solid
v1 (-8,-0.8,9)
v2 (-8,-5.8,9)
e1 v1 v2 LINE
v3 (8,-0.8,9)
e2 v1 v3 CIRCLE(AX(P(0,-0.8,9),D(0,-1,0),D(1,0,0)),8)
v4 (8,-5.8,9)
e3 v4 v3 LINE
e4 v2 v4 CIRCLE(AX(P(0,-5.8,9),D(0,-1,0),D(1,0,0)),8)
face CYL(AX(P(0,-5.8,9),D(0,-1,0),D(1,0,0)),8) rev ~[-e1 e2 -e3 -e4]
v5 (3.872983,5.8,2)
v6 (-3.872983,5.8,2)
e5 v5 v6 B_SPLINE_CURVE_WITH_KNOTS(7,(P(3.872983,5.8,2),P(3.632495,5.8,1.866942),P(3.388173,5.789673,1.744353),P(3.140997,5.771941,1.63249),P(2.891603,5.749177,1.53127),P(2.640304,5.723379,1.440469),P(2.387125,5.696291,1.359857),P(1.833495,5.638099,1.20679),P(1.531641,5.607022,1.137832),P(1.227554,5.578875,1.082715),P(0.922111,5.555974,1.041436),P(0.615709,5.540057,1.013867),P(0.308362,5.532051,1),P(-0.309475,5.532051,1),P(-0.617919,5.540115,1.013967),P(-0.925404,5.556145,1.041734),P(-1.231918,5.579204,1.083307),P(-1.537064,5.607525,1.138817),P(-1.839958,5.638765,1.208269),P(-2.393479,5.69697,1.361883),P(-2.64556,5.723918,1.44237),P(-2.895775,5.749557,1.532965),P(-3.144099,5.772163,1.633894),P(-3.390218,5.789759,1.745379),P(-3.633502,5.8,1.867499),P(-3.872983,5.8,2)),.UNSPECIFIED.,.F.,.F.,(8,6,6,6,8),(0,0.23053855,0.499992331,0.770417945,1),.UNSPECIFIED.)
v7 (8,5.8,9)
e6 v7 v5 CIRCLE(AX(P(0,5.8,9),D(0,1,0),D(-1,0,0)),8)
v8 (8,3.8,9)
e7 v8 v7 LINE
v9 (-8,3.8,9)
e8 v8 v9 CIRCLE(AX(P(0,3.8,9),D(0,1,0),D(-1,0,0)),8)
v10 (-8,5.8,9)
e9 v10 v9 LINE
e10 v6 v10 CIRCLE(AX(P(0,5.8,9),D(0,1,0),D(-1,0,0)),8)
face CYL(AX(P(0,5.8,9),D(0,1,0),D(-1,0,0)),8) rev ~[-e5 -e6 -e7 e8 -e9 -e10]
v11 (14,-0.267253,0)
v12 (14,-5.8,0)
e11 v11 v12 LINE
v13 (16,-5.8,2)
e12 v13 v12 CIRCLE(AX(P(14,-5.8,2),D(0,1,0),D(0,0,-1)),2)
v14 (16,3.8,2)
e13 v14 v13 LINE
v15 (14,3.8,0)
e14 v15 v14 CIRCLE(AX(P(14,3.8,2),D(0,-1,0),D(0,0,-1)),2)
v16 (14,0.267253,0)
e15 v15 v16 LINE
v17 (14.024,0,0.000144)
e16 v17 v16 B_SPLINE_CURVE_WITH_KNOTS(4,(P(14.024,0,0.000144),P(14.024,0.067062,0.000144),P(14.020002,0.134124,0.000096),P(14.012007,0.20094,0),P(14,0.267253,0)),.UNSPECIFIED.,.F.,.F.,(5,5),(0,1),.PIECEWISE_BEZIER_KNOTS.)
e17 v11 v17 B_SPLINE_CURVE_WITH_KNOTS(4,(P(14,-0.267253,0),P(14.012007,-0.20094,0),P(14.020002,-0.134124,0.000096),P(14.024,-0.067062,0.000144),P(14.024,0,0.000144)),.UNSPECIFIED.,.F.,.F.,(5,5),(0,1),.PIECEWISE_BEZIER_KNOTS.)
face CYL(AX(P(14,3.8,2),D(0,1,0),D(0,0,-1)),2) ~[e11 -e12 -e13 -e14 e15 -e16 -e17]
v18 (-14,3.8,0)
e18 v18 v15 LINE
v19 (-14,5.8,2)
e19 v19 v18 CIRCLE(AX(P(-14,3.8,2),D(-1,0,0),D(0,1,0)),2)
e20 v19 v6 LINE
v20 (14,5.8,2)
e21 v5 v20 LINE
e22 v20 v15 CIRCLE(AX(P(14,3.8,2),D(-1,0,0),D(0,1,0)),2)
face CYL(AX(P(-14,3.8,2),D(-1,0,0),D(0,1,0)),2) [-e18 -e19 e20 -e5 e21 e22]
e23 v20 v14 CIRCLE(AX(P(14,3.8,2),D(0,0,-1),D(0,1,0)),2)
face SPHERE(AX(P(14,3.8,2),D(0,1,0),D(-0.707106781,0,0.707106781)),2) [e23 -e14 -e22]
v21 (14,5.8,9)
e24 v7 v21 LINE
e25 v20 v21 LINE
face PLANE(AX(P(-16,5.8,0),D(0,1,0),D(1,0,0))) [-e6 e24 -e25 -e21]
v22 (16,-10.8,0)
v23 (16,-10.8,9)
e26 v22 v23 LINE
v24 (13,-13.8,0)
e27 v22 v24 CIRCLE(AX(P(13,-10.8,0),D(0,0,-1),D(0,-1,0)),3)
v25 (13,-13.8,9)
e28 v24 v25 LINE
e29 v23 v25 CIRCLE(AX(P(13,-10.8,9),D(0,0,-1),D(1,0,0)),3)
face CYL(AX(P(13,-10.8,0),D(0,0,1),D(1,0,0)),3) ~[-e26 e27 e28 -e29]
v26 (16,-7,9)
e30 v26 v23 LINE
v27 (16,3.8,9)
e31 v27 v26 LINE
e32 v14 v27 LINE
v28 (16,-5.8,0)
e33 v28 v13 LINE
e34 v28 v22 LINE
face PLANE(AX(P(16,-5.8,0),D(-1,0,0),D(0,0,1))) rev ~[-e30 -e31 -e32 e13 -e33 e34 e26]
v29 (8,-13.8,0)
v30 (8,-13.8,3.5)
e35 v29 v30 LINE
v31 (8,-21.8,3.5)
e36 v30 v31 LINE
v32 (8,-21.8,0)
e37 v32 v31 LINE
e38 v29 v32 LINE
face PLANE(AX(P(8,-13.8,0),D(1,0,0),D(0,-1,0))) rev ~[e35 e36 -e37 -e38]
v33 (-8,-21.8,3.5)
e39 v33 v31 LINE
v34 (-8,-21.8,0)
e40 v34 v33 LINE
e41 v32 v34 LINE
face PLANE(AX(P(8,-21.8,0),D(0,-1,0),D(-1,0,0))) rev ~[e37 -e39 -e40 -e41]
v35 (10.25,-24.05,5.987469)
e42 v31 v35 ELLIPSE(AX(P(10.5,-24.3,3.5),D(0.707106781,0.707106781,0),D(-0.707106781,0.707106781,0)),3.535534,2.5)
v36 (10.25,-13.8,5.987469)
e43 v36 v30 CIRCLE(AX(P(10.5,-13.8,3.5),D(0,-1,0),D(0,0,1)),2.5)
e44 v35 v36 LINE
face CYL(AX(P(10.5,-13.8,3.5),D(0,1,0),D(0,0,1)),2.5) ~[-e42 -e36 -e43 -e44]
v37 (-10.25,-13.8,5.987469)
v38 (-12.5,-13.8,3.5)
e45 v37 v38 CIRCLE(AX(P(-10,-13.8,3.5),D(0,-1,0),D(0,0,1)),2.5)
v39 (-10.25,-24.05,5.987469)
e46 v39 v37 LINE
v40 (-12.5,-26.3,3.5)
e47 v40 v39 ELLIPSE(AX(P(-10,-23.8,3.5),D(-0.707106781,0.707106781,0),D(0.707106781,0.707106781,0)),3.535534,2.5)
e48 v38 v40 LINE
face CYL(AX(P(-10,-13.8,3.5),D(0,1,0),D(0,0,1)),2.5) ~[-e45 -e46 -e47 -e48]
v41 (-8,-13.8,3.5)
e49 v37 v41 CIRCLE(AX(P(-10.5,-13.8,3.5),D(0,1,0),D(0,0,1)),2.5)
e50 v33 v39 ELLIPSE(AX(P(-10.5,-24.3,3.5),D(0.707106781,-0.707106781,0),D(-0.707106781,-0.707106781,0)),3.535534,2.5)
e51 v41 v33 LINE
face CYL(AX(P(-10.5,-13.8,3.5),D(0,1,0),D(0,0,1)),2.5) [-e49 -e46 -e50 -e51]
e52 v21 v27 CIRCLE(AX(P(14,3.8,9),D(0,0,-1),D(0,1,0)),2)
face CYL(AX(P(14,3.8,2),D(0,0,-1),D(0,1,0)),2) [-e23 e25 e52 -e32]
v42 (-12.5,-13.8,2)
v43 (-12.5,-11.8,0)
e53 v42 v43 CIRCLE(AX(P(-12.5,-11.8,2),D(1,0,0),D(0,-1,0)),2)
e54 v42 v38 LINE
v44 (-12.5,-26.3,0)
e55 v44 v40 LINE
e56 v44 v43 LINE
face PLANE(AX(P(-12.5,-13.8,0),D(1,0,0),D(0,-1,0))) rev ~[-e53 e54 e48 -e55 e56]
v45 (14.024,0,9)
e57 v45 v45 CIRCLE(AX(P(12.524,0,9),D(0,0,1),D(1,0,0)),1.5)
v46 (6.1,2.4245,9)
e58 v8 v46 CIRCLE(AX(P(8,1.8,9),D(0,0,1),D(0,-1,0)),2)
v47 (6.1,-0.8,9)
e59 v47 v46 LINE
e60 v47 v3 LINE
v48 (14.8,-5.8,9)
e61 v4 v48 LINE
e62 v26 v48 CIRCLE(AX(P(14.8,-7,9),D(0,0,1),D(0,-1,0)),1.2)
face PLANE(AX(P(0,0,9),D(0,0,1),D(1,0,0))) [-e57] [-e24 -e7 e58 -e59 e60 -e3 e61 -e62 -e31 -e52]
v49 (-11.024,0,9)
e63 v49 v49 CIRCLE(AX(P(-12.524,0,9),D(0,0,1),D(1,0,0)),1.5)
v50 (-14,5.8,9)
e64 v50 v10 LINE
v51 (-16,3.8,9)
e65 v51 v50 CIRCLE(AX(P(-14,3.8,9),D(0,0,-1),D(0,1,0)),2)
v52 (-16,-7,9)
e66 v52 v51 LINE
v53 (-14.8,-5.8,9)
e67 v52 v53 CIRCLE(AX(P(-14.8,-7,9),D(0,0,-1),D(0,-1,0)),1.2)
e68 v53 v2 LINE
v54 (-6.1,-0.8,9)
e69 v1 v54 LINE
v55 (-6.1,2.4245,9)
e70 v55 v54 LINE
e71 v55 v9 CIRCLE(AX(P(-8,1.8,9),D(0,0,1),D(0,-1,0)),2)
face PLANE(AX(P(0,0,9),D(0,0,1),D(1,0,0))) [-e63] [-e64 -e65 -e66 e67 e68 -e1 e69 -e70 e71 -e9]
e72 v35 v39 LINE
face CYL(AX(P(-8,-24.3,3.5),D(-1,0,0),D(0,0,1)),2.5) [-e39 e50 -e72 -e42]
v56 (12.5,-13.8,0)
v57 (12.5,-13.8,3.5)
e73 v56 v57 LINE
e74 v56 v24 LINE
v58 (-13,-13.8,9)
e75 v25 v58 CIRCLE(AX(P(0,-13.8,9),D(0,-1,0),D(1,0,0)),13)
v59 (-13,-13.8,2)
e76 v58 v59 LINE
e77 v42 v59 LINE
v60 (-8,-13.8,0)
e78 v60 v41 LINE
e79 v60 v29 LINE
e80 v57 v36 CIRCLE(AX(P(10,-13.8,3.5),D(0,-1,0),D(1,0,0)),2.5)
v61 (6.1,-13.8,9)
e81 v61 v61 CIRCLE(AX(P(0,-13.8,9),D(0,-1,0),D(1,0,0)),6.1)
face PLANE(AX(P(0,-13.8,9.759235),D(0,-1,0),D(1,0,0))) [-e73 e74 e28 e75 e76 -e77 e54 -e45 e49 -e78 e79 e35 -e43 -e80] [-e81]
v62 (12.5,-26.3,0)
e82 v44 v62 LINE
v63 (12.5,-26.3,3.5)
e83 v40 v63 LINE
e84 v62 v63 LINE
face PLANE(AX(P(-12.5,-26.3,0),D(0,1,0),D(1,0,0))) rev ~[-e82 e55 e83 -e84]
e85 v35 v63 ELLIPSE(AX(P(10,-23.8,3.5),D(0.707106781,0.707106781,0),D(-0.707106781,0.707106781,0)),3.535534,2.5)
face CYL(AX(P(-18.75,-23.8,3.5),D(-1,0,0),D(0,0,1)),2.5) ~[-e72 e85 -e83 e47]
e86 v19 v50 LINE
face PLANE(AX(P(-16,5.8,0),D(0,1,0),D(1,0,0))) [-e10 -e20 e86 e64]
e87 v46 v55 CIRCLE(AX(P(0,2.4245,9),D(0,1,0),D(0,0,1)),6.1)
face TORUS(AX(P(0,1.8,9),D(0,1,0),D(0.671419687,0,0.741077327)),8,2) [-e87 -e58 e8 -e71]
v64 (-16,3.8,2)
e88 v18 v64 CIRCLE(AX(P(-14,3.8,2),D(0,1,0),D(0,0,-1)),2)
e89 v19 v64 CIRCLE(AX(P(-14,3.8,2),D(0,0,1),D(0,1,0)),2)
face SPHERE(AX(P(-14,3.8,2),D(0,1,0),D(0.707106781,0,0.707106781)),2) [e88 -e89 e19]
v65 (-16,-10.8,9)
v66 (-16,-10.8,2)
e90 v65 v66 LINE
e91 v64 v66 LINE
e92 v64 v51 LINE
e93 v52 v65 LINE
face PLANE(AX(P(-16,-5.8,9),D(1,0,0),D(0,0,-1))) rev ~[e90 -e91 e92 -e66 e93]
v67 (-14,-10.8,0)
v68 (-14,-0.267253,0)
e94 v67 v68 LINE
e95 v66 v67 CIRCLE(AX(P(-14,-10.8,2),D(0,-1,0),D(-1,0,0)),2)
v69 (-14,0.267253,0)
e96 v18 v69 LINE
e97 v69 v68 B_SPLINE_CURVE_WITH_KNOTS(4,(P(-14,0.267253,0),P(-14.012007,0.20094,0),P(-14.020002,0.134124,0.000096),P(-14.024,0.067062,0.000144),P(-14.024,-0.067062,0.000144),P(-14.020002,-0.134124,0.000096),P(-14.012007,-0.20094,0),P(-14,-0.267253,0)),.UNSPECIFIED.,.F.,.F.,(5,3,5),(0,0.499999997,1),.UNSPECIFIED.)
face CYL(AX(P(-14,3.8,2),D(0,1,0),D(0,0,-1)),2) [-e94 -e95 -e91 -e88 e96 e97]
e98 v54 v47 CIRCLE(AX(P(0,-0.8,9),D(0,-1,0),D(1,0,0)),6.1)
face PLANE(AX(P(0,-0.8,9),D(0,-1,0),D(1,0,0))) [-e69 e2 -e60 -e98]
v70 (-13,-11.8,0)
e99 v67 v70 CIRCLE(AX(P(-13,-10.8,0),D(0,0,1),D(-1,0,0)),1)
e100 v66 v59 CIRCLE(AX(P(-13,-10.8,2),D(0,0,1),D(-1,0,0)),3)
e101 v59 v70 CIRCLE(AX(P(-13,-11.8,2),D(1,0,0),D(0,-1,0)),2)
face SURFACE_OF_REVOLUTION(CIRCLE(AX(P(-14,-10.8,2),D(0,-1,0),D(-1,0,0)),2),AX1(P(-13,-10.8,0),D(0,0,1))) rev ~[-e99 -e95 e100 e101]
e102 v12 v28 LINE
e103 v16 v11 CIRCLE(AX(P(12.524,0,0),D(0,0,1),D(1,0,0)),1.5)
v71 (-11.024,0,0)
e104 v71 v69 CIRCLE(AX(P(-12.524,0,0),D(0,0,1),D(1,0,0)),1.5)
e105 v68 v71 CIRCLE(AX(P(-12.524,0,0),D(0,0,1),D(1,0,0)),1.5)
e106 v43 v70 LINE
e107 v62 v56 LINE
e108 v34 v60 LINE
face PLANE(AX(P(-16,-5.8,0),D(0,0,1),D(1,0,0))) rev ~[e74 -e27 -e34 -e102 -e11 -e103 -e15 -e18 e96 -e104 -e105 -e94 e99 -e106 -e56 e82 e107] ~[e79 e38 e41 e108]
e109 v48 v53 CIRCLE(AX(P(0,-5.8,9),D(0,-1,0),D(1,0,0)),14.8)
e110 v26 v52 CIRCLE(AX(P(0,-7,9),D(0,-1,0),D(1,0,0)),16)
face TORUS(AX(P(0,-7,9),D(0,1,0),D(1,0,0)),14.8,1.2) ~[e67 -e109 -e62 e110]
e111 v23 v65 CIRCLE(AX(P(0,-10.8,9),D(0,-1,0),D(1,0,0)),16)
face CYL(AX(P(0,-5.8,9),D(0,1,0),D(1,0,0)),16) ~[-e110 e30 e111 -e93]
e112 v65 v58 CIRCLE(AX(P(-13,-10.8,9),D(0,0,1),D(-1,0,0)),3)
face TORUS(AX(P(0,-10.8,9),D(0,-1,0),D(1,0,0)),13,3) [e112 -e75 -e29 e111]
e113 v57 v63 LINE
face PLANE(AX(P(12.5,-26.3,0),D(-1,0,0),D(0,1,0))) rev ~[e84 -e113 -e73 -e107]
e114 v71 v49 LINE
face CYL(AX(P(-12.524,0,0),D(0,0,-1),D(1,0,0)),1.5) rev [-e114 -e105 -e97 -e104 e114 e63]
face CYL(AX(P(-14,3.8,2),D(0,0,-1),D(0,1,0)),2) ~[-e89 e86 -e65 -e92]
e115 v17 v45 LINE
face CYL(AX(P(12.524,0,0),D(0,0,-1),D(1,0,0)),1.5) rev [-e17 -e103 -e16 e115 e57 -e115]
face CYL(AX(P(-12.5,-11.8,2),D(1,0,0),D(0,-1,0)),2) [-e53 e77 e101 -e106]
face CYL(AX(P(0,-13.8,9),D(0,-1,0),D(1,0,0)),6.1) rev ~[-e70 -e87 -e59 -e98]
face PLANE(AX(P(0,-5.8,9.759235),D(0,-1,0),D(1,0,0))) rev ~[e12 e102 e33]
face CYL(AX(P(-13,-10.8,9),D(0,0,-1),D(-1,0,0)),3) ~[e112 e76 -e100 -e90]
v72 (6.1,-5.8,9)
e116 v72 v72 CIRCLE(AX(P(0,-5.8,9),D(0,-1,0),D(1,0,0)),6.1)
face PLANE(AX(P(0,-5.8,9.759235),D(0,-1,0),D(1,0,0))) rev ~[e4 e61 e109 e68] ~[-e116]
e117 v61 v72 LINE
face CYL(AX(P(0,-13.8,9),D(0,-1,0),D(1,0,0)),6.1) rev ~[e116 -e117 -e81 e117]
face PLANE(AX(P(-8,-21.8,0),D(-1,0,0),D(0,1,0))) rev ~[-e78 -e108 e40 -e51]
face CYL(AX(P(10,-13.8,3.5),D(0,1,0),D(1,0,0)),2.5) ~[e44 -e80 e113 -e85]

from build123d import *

# Parameters (mm, degrees)
F0_W          = 32
F0_H          = 11.6
F0_R          = 1.5
F1_DEPTH      = 9
F2_R          = 8
F1_FACE1_W    = 32
F1_FACE1_H    = 9
F3_DEPTH      = 5
F4_R          = 8
F5_DEPTH      = 2
F6_R          = 6
F7_DEPTH      = 25
F8_T1_DEPTH   = 28
F8_T3_DEPTH   = 12
F8_T5_DEPTH   = 14.6
F8_S9_W       = 2
F8_S9_H       = 2
F8_T10_DEPTH  = 2
F8_S15_W      = 2
F8_S15_H      = 2
F8_T16_DEPTH  = 2
F8_T20_ANGLE  = 275.6465366004
F10_DEPTH     = 8
F12_DEPTH     = 6
F13_T1_DEPTH  = 8
F13_T3_DEPTH  = 18.75
F13_T5_DEPTH  = 16
F13_T7_DEPTH  = 37.5
F13_T13_DEPTH = 14.25
F13_T17_DEPTH = 22.25
F13_T24_DEPTH = 14.25
F13_T28_DEPTH = 22.25
F14_R         = 3
F15_R         = 1.2
F16_R         = 6.1
F17_DEPTH     = 19.6010001
F18_T3_ANGLE  = 90
F18_T6_DEPTH  = 10
F18_T9_DEPTH  = 0.5


# Not quite as in the source:
# - a fillet or chamfer that OpenCascade refuses, or shapes differently, is made with other operations: its cross-section is extruded or revolved along the edge and cut away or added


with BuildPart() as f1:
    # F0 (on Top) → F1 (new body)
    with BuildSketch(Plane.XY):
        Rectangle(F0_W, F0_H)
        with Locations((-12.524, 0)):
            Circle(F0_R, mode=Mode.SUBTRACT)
        with Locations((12.524, 0)):
            Circle(F0_R, mode=Mode.SUBTRACT)
    extrude(amount=F1_DEPTH)

    # F2 (on face) + F1_face1 (on face) → F3 (cut)
    with BuildSketch(Plane.XZ.offset(5.8)):
        with Locations((0, 9)):
            Circle(F2_R)
    with BuildSketch(Plane(origin=(0, 5.8, 4.5), x_dir=(-1, 0, 0), z_dir=(0, 1, 0))):
        Rectangle(F1_FACE1_W, F1_FACE1_H)
    extrude(amount=-F3_DEPTH, dir=(0, -1, 0), mode=Mode.SUBTRACT)

    # F4 (on face) → F5 (cut)
    with BuildSketch(Plane(origin=(0, 5.8, 0), x_dir=(-1, 0, 0), z_dir=(0, 1, 0))):
        with Locations((0, 9)):
            Circle(F4_R)
    extrude(amount=-F5_DEPTH, mode=Mode.SUBTRACT)

    # F6 (on face) → F7 (cut)
    with BuildSketch(Plane(origin=(0, 3.8, 0), x_dir=(-1, 0, 0), z_dir=(0, 1, 0))):
        with Locations((0, 9)):
            Circle(F6_R)
    extrude(amount=-F7_DEPTH, mode=Mode.SUBTRACT)

    # F8: fillet of radius 2 on 6 edges, made by hand

    # F8_s2 → F8_t1 (cut)
    with BuildSketch(Plane.YZ.offset(-14)):
        with BuildLine():
            ThreePointArc((5.8, 2), (5.2142135624, 0.5857864376), (3.8, 0))
            Line((3.8, 0), (5.8, 0))
            Line((5.8, 0), (5.8, 2))
        make_face()
    extrude(amount=F8_T1_DEPTH, mode=Mode.SUBTRACT)

    # F8_s4 → F8_t3 (cut)
    with BuildSketch(Plane.XY.offset(2)):
        with BuildLine():
            ThreePointArc((-14, 5.8), (-15.4142135624, 5.2142135624), (-16, 3.8))
            Line((-16, 3.8), (-16, 5.8))
            Line((-16, 5.8), (-14, 5.8))
        make_face()
        with BuildLine():
            ThreePointArc((14, 5.8), (15.4142135624, 5.2142135624), (16, 3.8))
            Line((16, 3.8), (16, 5.8))
            Line((16, 5.8), (14, 5.8))
        make_face()
    extrude(amount=F8_T3_DEPTH, mode=Mode.SUBTRACT)

    # F8_s6 → F8_t5 (cut)
    with BuildSketch(Plane.XZ.offset(-3.8)):
        with BuildLine():
            ThreePointArc((-14, 0), (-15.4142135624, 0.5857864376), (-16, 2))
            Line((-16, 2), (-16, 0))
            Line((-16, 0), (-14, 0))
        make_face()
        with BuildLine():
            ThreePointArc((14, 0), (15.4142135624, 0.5857864376), (16, 2))
            Line((16, 2), (16, 0))
            Line((16, 0), (14, 0))
        make_face()
    extrude(amount=F8_T5_DEPTH, mode=Mode.SUBTRACT)


with BuildPart() as f8_tool8:
    # F8_s9 → F8_t10 (new body)
    with BuildSketch(Plane.XZ.offset(-3.8)):
        with Locations((15, 1)):
            Rectangle(F8_S9_W, F8_S9_H)
    extrude(amount=-F8_T10_DEPTH)

    # F8_s11 → F8_t12 (revolve, cut)
    with BuildSketch(Plane(origin=(14, 3.8, 2), x_dir=(-0.7071067812, 0, 0.7071067812), z_dir=(-0.7071067812, 0, -0.7071067812))):
        with BuildLine():
            ThreePointArc((0, -2), (2, 0), (0, 2))
            Line((0, 2), (0, -2))
        make_face()
    revolve(axis=Axis((14, 3.8, 2), (0, 1, 0)), mode=Mode.SUBTRACT)


with BuildPart() as f1_1:
    add(f1.part)

    # F8_t7: cut F8_tool8
    add(f8_tool8.part, mode=Mode.SUBTRACT)


with BuildPart() as f8_tool14:
    # F8_s15 → F8_t16 (new body)
    with BuildSketch(Plane.XZ.offset(-3.8)):
        with Locations((-15, 1)):
            Rectangle(F8_S15_W, F8_S15_H)
    extrude(amount=-F8_T16_DEPTH)

    # F8_s17 → F8_t18 (revolve, cut)
    with BuildSketch(Plane(origin=(-14, 3.8, 2), x_dir=(0.7071067812, 0, 0.7071067812), z_dir=(-0.7071067812, 0, 0.7071067812))):
        with BuildLine():
            ThreePointArc((0, -2), (2, 0), (0, 2))
            Line((0, 2), (0, -2))
        make_face()
    revolve(axis=Axis((-14, 3.8, 2), (0, 1, 0)), mode=Mode.SUBTRACT)


with BuildPart() as f1_2:
    add(f1_1.part)

    # F8_t13: cut F8_tool14
    add(f8_tool14.part, mode=Mode.SUBTRACT)

    # F8_s19 → F8_t20 (revolve, cut)
    with BuildSketch(Plane(origin=(-4.4781651596, 0, 4.057239564), x_dir=(0, 1, 0), z_dir=(-0.7410773266, 0, 0.6714196869))):
        with BuildLine():
            ThreePointArc((3.8, -14.6696959394), (3.2142135624, -13.255482377), (1.8, -12.6696959394))
            Line((1.8, -12.6696959394), (3.8, -12.6696959394))
            Line((3.8, -12.6696959394), (3.8, -14.6696959394))
        make_face()
    revolve(axis=Axis((0, 3.8, 9), (0, 1, 0)), revolution_arc=F8_T20_ANGLE, mode=Mode.SUBTRACT)

    # F9 (on face) → F10 (join)
    with BuildSketch(Plane.XZ.offset(5.8)):
        with BuildLine():
            Line((16, 0), (16, 9))
            ThreePointArc((16, 9), (0, 25), (-16, 9))
            Line((-16, 9), (-16, 0))
            Line((-16, 0), (-13.2287565553, 0))
            Line((-13.2287565553, 0), (0, 0))
            Line((0, 0), (13.2287565553, 0))
            Line((13.2287565553, 0), (16, 0))
        make_face()
    extrude(amount=F10_DEPTH)

    # F11 (on Top) → F12 (join)
    with BuildSketch(Plane.XY):
        Polygon((-8, -21.8), (-8, -13.8), (-12.5, -13.8), (-12.5, -26.3), (12.5, -26.3), (12.5, -13.8), (8, -13.8), (8, -21.8), align=None)
    extrude(amount=F12_DEPTH)

    # F13: fillet of radius 2.5 on 6 edges, made by hand

    # F13_s2 → F13_t1 (cut)
    with BuildSketch(Plane.XZ.offset(13.8)):
        with BuildLine():
            ThreePointArc((-10.5, 6), (-8.732233047, 5.267766953), (-8, 3.5))
            Line((-8, 3.5), (-8, 6))
            Line((-8, 6), (-10.5, 6))
        make_face()
        with BuildLine():
            ThreePointArc((10.5, 6), (8.732233047, 5.267766953), (8, 3.5))
            Line((8, 3.5), (8, 6))
            Line((8, 6), (10.5, 6))
        make_face()
    extrude(amount=F13_T1_DEPTH, mode=Mode.SUBTRACT)

    # F13_s4 → F13_t3 (cut)
    with BuildSketch(Plane.XZ.offset(13.8)):
        with BuildLine():
            ThreePointArc((-10, 6), (-11.767766953, 5.267766953), (-12.5, 3.5))
            Line((-12.5, 3.5), (-12.5, 6))
            Line((-12.5, 6), (-10, 6))
        make_face()
        with BuildLine():
            ThreePointArc((12.5, 3.5), (11.767766953, 5.267766953), (10, 6))
            Line((10, 6), (12.5, 6))
            Line((12.5, 6), (12.5, 3.5))
        make_face()
    extrude(amount=F13_T3_DEPTH, mode=Mode.SUBTRACT)

    # F13_s6 → F13_t5 (cut)
    with BuildSketch(Plane.YZ.offset(-8)):
        with BuildLine():
            ThreePointArc((-24.3, 6), (-22.532233047, 5.267766953), (-21.8, 3.5))
            Line((-21.8, 3.5), (-21.8, 6))
            Line((-21.8, 6), (-24.3, 6))
        make_face()
    extrude(amount=F13_T5_DEPTH, mode=Mode.SUBTRACT)

    # F13_s8 → F13_t7 (cut)
    with BuildSketch(Plane.YZ.offset(-18.75)):
        with BuildLine():
            ThreePointArc((-23.8, 6), (-25.567766953, 5.267766953), (-26.3, 3.5))
            Line((-26.3, 3.5), (-26.3, 6))
            Line((-26.3, 6), (-23.8, 6))
        make_face()
    extrude(amount=F13_T7_DEPTH, mode=Mode.SUBTRACT)


with BuildPart() as f13_tool11:
    # F13_s12 → F13_t13 (new body)
    with BuildSketch(Plane.XZ.offset(28.05)):
        with BuildLine():
            ThreePointArc((-10.5, 6), (-8.732233047, 5.267766953), (-8, 3.5))
            Line((-8, 3.5), (-8, 6))
            Line((-8, 6), (-10.5, 6))
        make_face()
    extrude(amount=-F13_T13_DEPTH)

    split(bisect_by=Plane.XZ.offset(21.8), keep=Keep.TOP)


with BuildPart() as f13_tool15:
    # F13_s16 → F13_t17 (new body)
    with BuildSketch(Plane.YZ.offset(8)):
        with BuildLine():
            ThreePointArc((-24.3, 6), (-22.532233047, 5.267766953), (-21.8, 3.5))
            Line((-21.8, 3.5), (-21.8, 6))
            Line((-21.8, 6), (-24.3, 6))
        make_face()
    extrude(amount=-F13_T17_DEPTH)

    split(bisect_by=Plane.YZ.offset(-8), keep=Keep.BOTTOM)


with BuildPart() as f13_tool11_1:
    add(f13_tool11.part)

    # F13_t19: intersect F13_tool15
    add(f13_tool15.part, mode=Mode.INTERSECT)


with BuildPart() as f1_3:
    add(f1_2.part)

    # F13_t9: cut F13_tool11
    add(f13_tool11_1.part, mode=Mode.SUBTRACT)


with BuildPart() as f13_tool22:
    # F13_s23 → F13_t24 (new body)
    with BuildSketch(Plane.XZ.offset(13.8)):
        with BuildLine():
            ThreePointArc((10.5, 6), (8.732233047, 5.267766953), (8, 3.5))
            Line((8, 3.5), (8, 6))
            Line((8, 6), (10.5, 6))
        make_face()
    extrude(amount=F13_T24_DEPTH)

    split(bisect_by=Plane.XZ.offset(21.8), keep=Keep.TOP)


with BuildPart() as f13_tool26:
    # F13_s27 → F13_t28 (new body)
    with BuildSketch(Plane.YZ.offset(14.25)):
        with BuildLine():
            ThreePointArc((-24.3, 6), (-22.532233047, 5.267766953), (-21.8, 3.5))
            Line((-21.8, 3.5), (-21.8, 6))
            Line((-21.8, 6), (-24.3, 6))
        make_face()
    extrude(amount=-F13_T28_DEPTH)

    split(bisect_by=Plane.YZ.offset(8), keep=Keep.TOP)


with BuildPart() as f13_tool22_1:
    add(f13_tool22.part)

    # F13_t30: intersect F13_tool26
    add(f13_tool26.part, mode=Mode.INTERSECT)


with BuildPart() as f1_4:
    add(f1_3.part)

    # F13_t20: cut F13_tool22
    add(f13_tool22_1.part, mode=Mode.SUBTRACT)

    # F14
    f14_edges = [f1_4.edges().sort_by_distance(p)[0] for p in [
        (0, -13.8, 25),
        (16, -13.8, 4.5),
    ]]
    fillet(f14_edges, radius=F14_R)

    # F15
    f15_edges = [f1_4.edges().sort_by_distance(p)[0] for p in [
        (0, -5.8, 25),
    ]]
    fillet(f15_edges, radius=F15_R)

    # F16 (on face) → F17 (cut, through all)
    with BuildSketch(Plane.XZ.offset(13.8)):
        with Locations((0, 9)):
            Circle(F16_R)
    extrude(amount=-F17_DEPTH, mode=Mode.SUBTRACT)

    # F18: fillet of radius 2 on 3 edges, made by hand


with BuildPart() as f18_tool1:
    # F18_s2 → F18_t3 (revolve)
    with BuildSketch(Plane.XZ.offset(10.8)):
        with BuildLine():
            ThreePointArc((-16, 2), (-15.4142135624, 0.5857864376), (-14, 0))
            Line((-14, 0), (-16, 0))
            Line((-16, 0), (-16, 2))
        make_face()
    revolve(axis=Axis((-13, -10.8, 0), (0, 0, 1)), revolution_arc=F18_T3_ANGLE)


with BuildPart() as f18_tool4:
    # F18_s5 → F18_t6 (new body)
    with BuildSketch(Plane.XZ.offset(0.8)):
        with BuildLine():
            ThreePointArc((-16, 2), (-15.4142135624, 0.5857864376), (-14, 0))
            Line((-14, 0), (-16, 0))
            Line((-16, 0), (-16, 2))
        make_face()
    extrude(amount=F18_T6_DEPTH)


with BuildPart() as f18_tool7:
    # F18_s8 → F18_t9 (new body)
    with BuildSketch(Plane.YZ.offset(-12.5)):
        with BuildLine():
            ThreePointArc((-13.8, 2), (-13.2142135624, 0.5857864376), (-11.8, 0))
            Line((-11.8, 0), (-13.8, 0))
            Line((-13.8, 0), (-13.8, 2))
        make_face()
    extrude(amount=-F18_T9_DEPTH)


with BuildPart() as f1_5:
    add(f1_4.part)

    # F18_t10: cut F18_tool1, F18_tool4, F18_tool7
    add([f18_tool1.part, f18_tool4.part, f18_tool7.part], mode=Mode.SUBTRACT)


solid = f1_5.part
